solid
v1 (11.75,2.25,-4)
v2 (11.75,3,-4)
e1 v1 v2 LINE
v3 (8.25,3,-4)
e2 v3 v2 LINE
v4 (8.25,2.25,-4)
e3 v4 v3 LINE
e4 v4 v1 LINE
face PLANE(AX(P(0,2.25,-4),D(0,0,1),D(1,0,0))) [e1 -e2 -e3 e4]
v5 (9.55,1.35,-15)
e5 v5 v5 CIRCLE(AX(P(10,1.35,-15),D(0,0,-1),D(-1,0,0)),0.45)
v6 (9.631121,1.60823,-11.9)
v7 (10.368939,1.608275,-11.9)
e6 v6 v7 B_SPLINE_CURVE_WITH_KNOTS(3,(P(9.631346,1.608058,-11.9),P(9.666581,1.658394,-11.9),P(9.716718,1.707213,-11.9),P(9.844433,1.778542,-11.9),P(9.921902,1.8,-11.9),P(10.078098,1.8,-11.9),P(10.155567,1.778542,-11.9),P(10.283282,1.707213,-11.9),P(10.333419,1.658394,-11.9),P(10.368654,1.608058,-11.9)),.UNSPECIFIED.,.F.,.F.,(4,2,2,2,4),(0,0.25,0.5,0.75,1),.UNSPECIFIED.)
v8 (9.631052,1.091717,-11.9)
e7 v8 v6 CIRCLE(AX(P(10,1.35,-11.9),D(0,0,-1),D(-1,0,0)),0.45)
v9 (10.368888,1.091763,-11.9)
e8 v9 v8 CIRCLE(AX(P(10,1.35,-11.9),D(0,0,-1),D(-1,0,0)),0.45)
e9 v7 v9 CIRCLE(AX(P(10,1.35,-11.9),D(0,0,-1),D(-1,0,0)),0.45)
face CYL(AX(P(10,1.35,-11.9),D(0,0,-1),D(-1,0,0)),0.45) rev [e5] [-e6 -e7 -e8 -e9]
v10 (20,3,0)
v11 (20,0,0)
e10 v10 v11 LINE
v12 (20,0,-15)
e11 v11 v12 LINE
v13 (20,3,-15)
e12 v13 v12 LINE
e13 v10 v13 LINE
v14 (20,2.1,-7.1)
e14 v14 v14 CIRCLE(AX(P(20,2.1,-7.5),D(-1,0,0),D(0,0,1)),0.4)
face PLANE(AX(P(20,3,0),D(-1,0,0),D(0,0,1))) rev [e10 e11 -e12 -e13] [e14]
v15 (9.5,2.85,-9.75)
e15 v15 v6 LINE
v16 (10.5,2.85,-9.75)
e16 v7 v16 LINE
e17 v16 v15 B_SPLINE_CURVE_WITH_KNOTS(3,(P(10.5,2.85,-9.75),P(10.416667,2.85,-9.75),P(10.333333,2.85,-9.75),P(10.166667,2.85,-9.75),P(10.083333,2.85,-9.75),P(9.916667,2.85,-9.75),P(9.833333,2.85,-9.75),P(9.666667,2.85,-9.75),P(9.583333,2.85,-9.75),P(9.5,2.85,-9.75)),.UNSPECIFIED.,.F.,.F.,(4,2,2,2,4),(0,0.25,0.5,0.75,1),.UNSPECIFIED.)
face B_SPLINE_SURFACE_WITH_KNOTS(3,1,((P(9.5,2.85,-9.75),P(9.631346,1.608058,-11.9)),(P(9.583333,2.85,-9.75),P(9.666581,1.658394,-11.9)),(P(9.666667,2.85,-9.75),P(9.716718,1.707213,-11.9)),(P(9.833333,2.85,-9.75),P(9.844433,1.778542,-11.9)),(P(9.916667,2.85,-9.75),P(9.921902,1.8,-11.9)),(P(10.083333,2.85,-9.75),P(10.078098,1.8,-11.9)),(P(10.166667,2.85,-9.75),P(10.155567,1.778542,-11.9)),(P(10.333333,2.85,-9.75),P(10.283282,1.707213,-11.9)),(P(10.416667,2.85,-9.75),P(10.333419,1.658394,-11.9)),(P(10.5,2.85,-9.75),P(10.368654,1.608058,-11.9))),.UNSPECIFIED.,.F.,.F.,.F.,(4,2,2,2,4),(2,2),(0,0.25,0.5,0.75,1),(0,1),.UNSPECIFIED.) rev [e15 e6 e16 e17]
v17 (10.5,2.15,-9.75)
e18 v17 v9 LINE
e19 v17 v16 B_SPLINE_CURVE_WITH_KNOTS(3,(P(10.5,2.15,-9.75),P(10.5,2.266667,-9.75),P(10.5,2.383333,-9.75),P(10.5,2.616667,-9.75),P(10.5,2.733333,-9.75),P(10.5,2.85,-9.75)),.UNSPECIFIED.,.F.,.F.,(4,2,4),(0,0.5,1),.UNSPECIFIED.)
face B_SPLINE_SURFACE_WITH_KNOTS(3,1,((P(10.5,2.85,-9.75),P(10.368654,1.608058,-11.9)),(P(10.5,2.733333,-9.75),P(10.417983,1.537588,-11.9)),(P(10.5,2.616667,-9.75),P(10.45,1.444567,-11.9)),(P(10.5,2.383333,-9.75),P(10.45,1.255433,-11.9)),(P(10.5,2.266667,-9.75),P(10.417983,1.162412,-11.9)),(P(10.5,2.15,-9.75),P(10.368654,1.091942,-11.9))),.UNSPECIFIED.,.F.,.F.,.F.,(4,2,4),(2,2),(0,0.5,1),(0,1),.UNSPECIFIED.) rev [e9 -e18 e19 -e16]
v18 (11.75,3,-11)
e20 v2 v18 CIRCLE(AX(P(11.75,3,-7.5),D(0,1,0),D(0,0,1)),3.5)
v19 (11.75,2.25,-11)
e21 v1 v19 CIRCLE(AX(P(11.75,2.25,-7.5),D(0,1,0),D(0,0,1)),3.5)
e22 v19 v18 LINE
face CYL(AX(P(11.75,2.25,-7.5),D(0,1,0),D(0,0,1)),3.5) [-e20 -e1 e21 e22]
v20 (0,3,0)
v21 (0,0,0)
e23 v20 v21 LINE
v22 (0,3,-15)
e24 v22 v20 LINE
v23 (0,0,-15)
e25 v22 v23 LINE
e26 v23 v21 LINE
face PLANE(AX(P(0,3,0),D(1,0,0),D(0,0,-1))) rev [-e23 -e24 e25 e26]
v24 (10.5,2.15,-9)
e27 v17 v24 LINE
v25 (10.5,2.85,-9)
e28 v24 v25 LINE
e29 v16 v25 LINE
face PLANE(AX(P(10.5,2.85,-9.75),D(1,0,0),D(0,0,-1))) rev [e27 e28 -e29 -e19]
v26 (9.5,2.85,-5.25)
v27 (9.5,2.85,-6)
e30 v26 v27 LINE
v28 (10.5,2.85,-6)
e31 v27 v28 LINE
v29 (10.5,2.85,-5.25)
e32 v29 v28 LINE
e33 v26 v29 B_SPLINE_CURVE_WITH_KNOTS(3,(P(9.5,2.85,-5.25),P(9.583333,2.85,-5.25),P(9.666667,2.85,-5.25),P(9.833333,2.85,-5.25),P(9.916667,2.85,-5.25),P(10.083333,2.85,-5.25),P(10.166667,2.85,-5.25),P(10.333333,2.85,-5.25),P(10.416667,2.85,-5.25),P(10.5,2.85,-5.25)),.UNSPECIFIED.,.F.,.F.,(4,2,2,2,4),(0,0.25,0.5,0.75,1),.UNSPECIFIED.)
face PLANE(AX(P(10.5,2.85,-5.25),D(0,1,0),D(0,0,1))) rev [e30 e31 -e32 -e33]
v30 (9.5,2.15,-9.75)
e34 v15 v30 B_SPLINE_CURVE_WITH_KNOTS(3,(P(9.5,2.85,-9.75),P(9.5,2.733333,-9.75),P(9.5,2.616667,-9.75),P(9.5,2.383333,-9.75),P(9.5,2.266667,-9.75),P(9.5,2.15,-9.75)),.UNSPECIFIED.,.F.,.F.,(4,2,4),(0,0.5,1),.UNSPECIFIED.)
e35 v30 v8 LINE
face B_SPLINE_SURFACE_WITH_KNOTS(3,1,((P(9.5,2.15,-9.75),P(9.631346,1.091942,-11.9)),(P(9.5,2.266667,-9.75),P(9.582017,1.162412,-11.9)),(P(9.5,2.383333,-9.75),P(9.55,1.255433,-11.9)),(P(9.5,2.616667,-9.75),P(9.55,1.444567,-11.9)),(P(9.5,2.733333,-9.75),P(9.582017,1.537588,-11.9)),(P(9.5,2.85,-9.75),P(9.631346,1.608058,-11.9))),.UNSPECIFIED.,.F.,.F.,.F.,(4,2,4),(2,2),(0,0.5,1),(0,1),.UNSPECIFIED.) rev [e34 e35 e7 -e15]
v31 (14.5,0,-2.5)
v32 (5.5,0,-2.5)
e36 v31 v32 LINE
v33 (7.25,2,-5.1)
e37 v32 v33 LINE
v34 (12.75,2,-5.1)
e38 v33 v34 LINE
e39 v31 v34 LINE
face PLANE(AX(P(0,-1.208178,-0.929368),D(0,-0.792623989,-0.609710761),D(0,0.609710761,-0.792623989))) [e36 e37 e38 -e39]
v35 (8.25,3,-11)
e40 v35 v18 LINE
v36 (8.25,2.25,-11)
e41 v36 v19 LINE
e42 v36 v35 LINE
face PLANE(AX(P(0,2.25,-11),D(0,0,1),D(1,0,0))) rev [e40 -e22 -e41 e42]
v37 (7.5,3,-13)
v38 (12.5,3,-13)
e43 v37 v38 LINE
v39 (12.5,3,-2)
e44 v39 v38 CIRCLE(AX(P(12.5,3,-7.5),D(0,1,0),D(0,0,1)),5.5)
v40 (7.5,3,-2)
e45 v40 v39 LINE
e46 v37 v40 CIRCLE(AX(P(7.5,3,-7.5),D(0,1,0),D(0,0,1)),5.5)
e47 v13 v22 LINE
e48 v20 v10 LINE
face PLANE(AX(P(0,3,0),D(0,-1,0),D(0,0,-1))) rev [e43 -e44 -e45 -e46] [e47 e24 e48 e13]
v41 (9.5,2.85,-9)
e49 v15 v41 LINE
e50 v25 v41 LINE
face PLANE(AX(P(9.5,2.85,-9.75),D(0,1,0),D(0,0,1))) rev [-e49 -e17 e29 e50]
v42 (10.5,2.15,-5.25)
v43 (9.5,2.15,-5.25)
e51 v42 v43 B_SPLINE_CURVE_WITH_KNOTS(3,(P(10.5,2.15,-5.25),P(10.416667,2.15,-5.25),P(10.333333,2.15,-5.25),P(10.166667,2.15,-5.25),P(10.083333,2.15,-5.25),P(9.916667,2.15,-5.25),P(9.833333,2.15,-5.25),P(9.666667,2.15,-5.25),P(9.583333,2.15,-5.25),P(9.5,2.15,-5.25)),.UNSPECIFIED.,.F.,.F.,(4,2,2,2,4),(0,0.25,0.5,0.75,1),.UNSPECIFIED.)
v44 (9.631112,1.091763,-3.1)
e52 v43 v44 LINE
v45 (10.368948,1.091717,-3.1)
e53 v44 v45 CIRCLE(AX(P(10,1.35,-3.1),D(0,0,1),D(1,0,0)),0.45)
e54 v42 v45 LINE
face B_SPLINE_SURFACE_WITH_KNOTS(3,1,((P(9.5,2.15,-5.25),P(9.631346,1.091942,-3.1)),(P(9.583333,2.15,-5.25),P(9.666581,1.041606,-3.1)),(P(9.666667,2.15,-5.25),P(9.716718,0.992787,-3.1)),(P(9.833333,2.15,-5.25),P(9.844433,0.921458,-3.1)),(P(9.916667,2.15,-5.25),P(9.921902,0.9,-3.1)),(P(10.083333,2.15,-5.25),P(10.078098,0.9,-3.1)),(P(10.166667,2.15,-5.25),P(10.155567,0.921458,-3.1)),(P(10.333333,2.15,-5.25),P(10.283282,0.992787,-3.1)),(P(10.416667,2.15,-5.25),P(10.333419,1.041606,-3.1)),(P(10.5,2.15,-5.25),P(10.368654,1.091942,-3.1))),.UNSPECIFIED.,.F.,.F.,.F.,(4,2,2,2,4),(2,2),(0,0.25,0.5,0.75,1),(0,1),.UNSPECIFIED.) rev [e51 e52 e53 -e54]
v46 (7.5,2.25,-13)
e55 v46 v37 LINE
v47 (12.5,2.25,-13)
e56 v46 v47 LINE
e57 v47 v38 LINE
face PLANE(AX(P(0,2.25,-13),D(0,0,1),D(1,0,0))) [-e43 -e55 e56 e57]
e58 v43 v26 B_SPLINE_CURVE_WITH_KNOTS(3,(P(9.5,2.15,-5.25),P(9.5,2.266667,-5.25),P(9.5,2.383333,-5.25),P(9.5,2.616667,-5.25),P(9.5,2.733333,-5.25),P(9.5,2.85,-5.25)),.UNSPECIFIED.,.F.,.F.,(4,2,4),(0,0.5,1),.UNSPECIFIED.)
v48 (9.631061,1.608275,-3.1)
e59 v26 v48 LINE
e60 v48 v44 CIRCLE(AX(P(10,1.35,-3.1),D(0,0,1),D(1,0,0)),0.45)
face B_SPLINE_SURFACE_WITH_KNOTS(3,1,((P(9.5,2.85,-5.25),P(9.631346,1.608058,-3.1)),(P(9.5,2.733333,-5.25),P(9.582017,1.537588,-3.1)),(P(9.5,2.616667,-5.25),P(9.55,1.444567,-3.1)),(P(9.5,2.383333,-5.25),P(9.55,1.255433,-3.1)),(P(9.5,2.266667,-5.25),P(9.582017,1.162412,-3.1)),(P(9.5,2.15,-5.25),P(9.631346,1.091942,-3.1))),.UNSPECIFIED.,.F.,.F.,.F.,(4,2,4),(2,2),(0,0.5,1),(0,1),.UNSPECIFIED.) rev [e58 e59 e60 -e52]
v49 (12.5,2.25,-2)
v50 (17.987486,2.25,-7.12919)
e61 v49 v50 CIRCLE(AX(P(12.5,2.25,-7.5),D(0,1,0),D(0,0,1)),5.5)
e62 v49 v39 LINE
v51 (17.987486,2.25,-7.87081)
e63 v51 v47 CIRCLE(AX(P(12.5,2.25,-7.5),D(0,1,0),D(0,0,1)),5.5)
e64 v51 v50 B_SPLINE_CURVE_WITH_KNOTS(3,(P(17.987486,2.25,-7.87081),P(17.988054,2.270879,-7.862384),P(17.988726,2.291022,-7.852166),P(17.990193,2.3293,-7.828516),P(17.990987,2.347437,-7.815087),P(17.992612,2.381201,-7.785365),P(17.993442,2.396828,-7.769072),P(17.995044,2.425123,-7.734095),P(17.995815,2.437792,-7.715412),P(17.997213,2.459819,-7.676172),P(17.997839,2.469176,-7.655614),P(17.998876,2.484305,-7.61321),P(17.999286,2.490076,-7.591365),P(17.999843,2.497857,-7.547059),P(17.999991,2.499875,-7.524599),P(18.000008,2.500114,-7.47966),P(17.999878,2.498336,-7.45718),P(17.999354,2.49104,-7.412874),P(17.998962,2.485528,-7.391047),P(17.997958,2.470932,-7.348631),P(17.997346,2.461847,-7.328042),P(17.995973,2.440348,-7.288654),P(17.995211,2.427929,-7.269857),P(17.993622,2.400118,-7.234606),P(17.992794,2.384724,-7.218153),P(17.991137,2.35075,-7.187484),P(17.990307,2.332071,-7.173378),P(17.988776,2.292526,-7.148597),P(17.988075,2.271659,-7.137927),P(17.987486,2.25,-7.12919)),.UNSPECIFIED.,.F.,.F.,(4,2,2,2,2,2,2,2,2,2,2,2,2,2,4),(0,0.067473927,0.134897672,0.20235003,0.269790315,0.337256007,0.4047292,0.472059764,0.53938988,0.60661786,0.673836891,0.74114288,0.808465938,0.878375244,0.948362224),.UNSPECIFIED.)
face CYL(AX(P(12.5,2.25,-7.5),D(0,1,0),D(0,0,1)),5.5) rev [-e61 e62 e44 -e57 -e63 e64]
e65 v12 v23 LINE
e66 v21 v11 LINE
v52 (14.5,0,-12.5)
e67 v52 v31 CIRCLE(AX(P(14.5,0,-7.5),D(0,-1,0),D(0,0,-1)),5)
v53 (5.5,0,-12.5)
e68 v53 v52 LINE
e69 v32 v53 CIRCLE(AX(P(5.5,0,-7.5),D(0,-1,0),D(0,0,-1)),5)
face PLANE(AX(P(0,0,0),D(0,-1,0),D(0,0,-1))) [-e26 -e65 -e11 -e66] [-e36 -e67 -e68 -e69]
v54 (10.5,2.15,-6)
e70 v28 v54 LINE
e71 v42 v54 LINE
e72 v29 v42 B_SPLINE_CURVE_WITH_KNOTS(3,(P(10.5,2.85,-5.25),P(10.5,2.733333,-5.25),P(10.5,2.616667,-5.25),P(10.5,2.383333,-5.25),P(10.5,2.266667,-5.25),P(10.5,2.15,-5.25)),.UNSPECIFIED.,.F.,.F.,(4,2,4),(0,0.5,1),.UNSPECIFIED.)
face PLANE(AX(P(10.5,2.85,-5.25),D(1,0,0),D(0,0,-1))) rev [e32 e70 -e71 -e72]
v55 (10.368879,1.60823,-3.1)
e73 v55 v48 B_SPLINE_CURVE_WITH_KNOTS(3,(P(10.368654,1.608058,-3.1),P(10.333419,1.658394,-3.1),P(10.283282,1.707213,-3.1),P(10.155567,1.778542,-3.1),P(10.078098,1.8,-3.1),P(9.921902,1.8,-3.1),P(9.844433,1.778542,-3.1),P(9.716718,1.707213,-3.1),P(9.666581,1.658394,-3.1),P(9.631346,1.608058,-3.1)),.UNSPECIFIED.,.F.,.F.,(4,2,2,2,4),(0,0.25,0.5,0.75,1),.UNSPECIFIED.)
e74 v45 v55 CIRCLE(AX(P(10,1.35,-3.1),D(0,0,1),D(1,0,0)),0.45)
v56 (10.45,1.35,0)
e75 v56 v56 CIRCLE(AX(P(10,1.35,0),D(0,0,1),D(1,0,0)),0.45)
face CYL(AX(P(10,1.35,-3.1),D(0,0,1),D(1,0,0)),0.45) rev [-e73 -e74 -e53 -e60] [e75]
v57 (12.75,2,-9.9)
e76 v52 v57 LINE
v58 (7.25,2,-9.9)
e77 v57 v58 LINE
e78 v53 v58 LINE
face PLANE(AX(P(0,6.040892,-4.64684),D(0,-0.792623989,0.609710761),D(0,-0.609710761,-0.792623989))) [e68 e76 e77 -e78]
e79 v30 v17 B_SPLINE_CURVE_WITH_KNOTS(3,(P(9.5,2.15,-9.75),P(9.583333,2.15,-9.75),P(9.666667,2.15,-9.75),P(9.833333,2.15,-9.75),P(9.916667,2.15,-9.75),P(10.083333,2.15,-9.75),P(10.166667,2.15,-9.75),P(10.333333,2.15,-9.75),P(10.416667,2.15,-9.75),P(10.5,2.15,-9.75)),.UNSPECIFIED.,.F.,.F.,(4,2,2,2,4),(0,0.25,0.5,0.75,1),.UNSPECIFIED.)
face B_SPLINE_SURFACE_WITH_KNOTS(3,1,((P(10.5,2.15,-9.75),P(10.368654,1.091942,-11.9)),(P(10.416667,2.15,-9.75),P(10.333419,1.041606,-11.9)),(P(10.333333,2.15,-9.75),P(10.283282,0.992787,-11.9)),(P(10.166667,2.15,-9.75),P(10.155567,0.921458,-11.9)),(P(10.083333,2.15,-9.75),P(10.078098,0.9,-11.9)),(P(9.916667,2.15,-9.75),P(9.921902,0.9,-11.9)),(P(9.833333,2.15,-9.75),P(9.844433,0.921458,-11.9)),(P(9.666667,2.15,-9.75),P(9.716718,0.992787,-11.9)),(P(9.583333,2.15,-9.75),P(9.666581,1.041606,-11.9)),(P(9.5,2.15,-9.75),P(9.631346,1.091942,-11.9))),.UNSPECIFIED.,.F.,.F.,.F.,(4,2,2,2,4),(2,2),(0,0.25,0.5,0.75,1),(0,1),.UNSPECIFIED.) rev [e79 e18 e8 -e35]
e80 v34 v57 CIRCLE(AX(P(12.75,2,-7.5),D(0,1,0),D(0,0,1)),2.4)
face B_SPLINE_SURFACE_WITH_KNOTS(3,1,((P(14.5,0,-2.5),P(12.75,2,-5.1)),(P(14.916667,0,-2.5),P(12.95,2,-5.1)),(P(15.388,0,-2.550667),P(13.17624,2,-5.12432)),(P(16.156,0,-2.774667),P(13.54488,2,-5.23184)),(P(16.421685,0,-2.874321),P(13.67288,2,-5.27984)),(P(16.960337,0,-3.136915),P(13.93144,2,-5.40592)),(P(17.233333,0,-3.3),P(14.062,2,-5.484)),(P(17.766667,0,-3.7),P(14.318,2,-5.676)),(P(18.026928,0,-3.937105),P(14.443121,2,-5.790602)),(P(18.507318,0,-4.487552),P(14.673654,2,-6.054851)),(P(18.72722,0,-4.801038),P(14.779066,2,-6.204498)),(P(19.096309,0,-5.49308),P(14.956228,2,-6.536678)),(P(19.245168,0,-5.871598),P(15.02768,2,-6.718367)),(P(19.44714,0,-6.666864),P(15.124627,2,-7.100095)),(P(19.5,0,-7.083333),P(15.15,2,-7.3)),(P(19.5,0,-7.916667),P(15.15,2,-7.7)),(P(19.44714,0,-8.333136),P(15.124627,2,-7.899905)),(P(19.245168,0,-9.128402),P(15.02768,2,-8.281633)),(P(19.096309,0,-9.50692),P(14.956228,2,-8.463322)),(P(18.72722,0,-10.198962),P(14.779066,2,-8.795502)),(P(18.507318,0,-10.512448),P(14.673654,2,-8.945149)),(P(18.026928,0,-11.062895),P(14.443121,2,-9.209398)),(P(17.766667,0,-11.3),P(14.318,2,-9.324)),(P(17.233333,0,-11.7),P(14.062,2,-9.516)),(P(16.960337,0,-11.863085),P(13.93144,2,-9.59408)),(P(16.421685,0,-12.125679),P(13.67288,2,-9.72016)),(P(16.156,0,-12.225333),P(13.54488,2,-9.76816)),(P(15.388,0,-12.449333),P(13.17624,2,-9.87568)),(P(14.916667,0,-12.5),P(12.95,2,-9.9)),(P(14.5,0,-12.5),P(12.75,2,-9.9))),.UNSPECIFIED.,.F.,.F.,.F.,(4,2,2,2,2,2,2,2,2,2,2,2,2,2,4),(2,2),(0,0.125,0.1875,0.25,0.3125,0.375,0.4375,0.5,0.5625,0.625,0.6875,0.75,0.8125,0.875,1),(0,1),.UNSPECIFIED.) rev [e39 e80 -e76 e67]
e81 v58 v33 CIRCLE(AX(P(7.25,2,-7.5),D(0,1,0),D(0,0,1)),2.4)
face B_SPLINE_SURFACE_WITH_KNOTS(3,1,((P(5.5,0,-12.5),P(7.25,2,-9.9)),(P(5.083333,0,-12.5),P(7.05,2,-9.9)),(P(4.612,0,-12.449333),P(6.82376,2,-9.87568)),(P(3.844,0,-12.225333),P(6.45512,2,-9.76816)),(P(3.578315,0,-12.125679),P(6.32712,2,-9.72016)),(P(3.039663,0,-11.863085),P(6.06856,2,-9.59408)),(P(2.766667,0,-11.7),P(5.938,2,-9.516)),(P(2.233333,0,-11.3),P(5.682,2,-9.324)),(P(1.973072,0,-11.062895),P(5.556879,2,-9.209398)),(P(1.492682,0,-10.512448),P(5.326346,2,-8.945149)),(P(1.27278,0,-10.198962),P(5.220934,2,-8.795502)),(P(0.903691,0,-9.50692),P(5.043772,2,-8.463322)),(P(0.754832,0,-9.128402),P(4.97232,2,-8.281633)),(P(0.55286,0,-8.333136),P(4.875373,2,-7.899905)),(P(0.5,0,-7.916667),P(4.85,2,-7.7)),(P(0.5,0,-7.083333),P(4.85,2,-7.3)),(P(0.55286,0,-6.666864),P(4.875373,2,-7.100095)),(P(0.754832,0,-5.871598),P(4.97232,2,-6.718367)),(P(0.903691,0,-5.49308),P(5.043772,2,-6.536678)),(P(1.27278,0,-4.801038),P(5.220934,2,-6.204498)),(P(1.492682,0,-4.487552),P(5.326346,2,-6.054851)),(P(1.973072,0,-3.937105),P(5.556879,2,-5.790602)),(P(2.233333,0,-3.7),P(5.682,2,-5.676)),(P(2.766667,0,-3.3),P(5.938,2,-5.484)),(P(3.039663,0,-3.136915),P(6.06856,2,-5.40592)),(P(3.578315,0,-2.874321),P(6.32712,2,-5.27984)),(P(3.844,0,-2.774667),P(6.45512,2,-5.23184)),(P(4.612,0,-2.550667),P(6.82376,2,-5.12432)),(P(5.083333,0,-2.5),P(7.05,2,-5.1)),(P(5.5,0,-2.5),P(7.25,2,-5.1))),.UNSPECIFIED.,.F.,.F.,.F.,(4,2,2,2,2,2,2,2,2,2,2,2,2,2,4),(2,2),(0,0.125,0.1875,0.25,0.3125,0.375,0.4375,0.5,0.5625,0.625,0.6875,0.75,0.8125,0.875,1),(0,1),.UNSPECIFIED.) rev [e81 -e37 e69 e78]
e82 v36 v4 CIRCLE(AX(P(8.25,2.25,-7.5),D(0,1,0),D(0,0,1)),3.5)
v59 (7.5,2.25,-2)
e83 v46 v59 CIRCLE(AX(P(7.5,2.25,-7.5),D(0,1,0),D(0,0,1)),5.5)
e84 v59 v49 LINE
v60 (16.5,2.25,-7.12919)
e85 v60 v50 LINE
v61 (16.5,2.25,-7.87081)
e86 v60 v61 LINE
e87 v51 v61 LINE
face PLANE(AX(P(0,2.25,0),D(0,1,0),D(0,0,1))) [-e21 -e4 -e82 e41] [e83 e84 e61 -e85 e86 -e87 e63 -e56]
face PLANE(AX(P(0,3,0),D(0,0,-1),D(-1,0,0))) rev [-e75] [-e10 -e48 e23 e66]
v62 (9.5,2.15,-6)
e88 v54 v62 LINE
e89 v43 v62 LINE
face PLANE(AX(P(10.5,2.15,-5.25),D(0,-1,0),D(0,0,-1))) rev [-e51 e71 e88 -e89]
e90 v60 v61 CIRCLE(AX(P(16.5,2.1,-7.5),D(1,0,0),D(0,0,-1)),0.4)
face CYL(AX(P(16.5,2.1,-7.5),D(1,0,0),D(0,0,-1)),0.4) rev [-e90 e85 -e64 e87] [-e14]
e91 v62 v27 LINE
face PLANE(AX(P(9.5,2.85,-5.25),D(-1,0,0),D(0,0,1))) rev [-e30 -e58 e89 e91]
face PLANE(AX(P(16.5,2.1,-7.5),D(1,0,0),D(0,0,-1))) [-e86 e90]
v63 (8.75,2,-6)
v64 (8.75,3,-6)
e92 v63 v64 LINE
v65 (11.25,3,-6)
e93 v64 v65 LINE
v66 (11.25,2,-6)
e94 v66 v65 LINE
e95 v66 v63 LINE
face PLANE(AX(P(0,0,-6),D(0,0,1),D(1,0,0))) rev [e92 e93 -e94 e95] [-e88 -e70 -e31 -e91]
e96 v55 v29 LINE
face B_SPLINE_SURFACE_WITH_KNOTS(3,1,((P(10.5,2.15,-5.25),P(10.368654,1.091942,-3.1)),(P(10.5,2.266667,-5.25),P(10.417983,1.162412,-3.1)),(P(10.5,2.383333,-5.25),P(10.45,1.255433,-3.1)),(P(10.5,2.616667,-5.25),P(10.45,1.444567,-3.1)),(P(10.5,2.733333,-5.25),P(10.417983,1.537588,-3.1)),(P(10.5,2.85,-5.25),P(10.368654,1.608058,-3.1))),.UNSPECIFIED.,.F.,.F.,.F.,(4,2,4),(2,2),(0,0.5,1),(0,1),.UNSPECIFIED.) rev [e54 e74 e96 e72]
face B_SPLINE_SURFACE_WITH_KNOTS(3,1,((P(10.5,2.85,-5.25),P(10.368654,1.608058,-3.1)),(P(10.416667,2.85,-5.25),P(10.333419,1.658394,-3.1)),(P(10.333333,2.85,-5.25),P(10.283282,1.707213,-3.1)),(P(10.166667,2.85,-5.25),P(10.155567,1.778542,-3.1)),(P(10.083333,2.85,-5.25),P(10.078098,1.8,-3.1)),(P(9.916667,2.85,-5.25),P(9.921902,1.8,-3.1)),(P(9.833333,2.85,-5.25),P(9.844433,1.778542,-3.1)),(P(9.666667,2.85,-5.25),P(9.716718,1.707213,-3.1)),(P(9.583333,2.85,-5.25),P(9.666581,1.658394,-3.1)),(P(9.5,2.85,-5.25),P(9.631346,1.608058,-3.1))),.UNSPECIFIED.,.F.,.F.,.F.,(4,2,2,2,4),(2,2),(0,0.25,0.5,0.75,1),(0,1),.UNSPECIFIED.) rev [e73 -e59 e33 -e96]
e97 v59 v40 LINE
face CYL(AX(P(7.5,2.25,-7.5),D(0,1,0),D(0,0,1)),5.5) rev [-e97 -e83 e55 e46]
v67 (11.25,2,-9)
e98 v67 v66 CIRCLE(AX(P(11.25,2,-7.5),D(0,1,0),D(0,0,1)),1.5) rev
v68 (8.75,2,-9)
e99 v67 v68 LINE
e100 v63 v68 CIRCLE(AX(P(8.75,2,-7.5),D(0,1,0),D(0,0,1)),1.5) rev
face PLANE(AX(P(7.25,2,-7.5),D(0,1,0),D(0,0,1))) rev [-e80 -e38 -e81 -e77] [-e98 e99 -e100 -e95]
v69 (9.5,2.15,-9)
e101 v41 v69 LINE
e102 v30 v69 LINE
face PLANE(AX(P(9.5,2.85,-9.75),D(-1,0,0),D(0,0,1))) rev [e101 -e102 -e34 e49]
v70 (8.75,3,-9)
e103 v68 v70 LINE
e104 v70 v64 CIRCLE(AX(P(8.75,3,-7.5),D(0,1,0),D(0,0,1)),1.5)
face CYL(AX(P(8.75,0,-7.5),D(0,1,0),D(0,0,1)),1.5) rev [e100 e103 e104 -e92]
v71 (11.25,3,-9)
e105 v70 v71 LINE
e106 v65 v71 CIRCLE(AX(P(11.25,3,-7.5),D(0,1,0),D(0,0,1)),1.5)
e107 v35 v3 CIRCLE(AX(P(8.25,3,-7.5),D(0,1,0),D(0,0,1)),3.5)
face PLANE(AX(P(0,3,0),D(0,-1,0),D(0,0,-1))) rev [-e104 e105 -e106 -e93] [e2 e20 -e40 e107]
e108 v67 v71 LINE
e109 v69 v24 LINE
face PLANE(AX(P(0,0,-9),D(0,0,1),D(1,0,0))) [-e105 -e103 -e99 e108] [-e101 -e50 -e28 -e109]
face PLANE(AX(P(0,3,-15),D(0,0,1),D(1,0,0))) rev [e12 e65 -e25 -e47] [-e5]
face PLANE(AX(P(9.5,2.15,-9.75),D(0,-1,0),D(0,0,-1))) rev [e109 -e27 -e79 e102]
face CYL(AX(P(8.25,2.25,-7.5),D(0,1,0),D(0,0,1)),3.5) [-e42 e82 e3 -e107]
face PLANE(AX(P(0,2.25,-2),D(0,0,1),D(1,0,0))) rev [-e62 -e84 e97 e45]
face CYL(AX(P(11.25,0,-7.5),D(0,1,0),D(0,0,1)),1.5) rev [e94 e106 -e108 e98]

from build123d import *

# Parameters (mm, degrees)
SKETCH1_W           = 20
SKETCH1_H           = 15
BOSS_EXTRUDE1_DEPTH = 3
CUT_EXTRUDE1_DEPTH  = 0.75
CUT_EXTRUDE2_DEPTH  = 26.179356624
SKETCH7_R           = 0.4
CUT_EXTRUDE6_DEPTH  = 3.5
SKETCH14_W          = 1
SKETCH14_H          = 0.7
CUT_EXTRUDE7_DEPTH  = 0.75
SKETCH15_R          = 0.45
CUT_EXTRUDE8_DEPTH  = 3.1
CUT_EXTRUDE9_START  = -3.1
SKETCH16_R          = 0.45
CUT_EXTRUDE9_DEPTH  = 3.1
SKETCH17_W          = 1
SKETCH17_H          = 0.7
CUT_EXTRUDE10_DEPTH = 0.75


with BuildPart() as part:
    # Sketch1 → Boss-Extrude1 (new body)
    with BuildSketch(Plane(origin=(0, 0, 0), x_dir=(1, 0, 0), z_dir=(0, 1, 0))):
        with Locations((10, 7.5)):
            Rectangle(SKETCH1_W, SKETCH1_H)
    extrude(amount=BOSS_EXTRUDE1_DEPTH)

    # Sketch2 → Cut-Extrude1 (cut)
    with BuildSketch(Plane(origin=(0, 3, 0), x_dir=(1, 0, 0), z_dir=(0, 1, 0))):
        with BuildLine():
            Line((7.5, 13), (12.5, 13))
            ThreePointArc((12.5, 13), (18, 7.5), (12.5, 2))
            Line((12.5, 2), (7.5, 2))
            ThreePointArc((7.5, 2), (2, 7.5), (7.5, 13))
        make_face()
        with BuildLine():
            Line((8.25, 11), (11.75, 11))
            ThreePointArc((11.75, 11), (15.25, 7.5), (11.75, 4))
            Line((11.75, 4), (8.25, 4))
            ThreePointArc((8.25, 4), (4.75, 7.5), (8.25, 11))
        make_face(mode=Mode.SUBTRACT)
    extrude(amount=-CUT_EXTRUDE1_DEPTH, mode=Mode.SUBTRACT)

    # Sketch2<3> → Cut-Extrude2 (cut, through all)
    with BuildSketch(Plane(origin=(0, 3, 0), x_dir=(1, 0, 0), z_dir=(0, 1, 0))):
        with BuildLine():
            Line((8.75, 6), (11.25, 6))
            ThreePointArc((11.25, 6), (12.75, 7.5), (11.25, 9))
            Line((11.25, 9), (8.75, 9))
            ThreePointArc((8.75, 9), (7.25, 7.5), (8.75, 6))
        make_face()
    extrude(amount=-CUT_EXTRUDE2_DEPTH, mode=Mode.SUBTRACT)

    # Sketch7 → Cut-Extrude6 (cut, symmetric)
    with BuildSketch(Plane(origin=(20, 0, 0), x_dir=(0, 0, -1), z_dir=(1, 0, 0))):
        with Locations(Location((7.5, 2.1, 0), (0, 0, 22.024312837))):
            Circle(SKETCH7_R)
    extrude(amount=CUT_EXTRUDE6_DEPTH, both=True, mode=Mode.SUBTRACT)

    # Sketch8 → Cut-Loft1 section 0
    with BuildSketch(Plane.XZ):
        with BuildLine():
            Line((5.5, -2.5), (14.5, -2.5))
            ThreePointArc((14.5, -2.5), (19.5, -7.5), (14.5, -12.5))
            Line((14.5, -12.5), (5.5, -12.5))
            ThreePointArc((5.5, -12.5), (0.5, -7.5), (5.5, -2.5))
        make_face()
    # Sketch9 → Cut-Loft1 section 1
    with BuildSketch(Plane(origin=(0, 2, 0), x_dir=(1, 0, 0), z_dir=(0, 1, 0))):
        with BuildLine():
            Line((7.25, 9.9), (12.75, 9.9))
            ThreePointArc((12.75, 9.9), (15.15, 7.5), (12.75, 5.1))
            Line((12.75, 5.1), (7.25, 5.1))
            ThreePointArc((7.25, 5.1), (4.85, 7.5), (7.25, 9.9))
        make_face()
    loft(mode=Mode.SUBTRACT)

    # Sketch14 → Cut-Extrude7 (cut)
    with BuildSketch(Plane(origin=(0, 0, -6), x_dir=(-1, 0, 0), z_dir=(0, 0, -1))):
        with Locations((-10, 2.5)):
            Rectangle(SKETCH14_W, SKETCH14_H)
    extrude(amount=-CUT_EXTRUDE7_DEPTH, mode=Mode.SUBTRACT)

    # Sketch15 → Cut-Extrude8 (cut)
    with BuildSketch(Plane.XY):
        with Locations((10, 1.35)):
            Circle(SKETCH15_R)
    extrude(amount=-CUT_EXTRUDE8_DEPTH, mode=Mode.SUBTRACT)

    # Sketch16 → Cut-Extrude9 (cut)
    with BuildSketch(Plane(origin=(0, 0, -15), x_dir=(-1, 0, 0), z_dir=(0, 0, -1)).offset(CUT_EXTRUDE9_START)):
        with Locations(Location((-10, 1.35, 0), (0, 0, 180))):
            Circle(SKETCH16_R)
    extrude(amount=CUT_EXTRUDE9_DEPTH, mode=Mode.SUBTRACT)

    # Sketch17 → Cut-Extrude10 (cut)
    with BuildSketch(Plane.XY.offset(-9)):
        with Locations((10, 2.5)):
            Rectangle(SKETCH17_W, SKETCH17_H)
    extrude(amount=-CUT_EXTRUDE10_DEPTH, mode=Mode.SUBTRACT)

    # Cut-Loft6: read off the stored shape, not the designer's step
    # Cut-Loft6: loft between two sections, ruled curve by curve
    cut_loft6_from = [
        Edge.make_bspline([(10.5, 2.85, -5.25), (10.416666667, 2.85, -5.25), (10.333333333, 2.85, -5.25), (10.166666667, 2.85, -5.25), (10.083333333, 2.85, -5.25), (9.916666667, 2.85, -5.25), (9.833333333, 2.85, -5.25), (9.666666667, 2.85, -5.25), (9.583333333, 2.85, -5.25), (9.5, 2.85, -5.25)], [0, 0, 0, 0, 0.25, 0.25, 0.5, 0.5, 0.75, 0.75, 1, 1, 1, 1], 3),
        Edge.make_bspline([(9.5, 2.85, -5.25), (9.5, 2.733333333, -5.25), (9.5, 2.616666667, -5.25), (9.5, 2.383333333, -5.25), (9.5, 2.266666667, -5.25), (9.5, 2.15, -5.25)], [0, 0, 0, 0, 0.5, 0.5, 1, 1, 1, 1], 3),
        Edge.make_bspline([(10.5, 2.15, -5.25), (10.5, 2.266666667, -5.25), (10.5, 2.383333333, -5.25), (10.5, 2.616666667, -5.25), (10.5, 2.733333333, -5.25), (10.5, 2.85, -5.25)], [0, 0, 0, 0, 0.5, 0.5, 1, 1, 1, 1], 3),
        Edge.make_bspline([(9.5, 2.15, -5.25), (9.583333333, 2.15, -5.25), (9.666666667, 2.15, -5.25), (9.833333333, 2.15, -5.25), (9.916666667, 2.15, -5.25), (10.083333333, 2.15, -5.25), (10.166666667, 2.15, -5.25), (10.333333333, 2.15, -5.25), (10.416666667, 2.15, -5.25), (10.5, 2.15, -5.25)], [0, 0, 0, 0, 0.25, 0.25, 0.5, 0.5, 0.75, 0.75, 1, 1, 1, 1], 3),
    ]
    cut_loft6_to = [
        Edge.make_bspline([(10.368654364, 1.608058055, -3.1), (10.333419465, 1.658393625, -3.1), (10.283281513, 1.707213189, -3.1), (10.155567455, 1.778542233, -3.1), (10.078098334, 1.8, -3.1), (9.921901666, 1.8, -3.1), (9.844432545, 1.778542233, -3.1), (9.716718487, 1.707213189, -3.1), (9.666580535, 1.658393625, -3.1), (9.631345636, 1.608058055, -3.1)], [0, 0, 0, 0, 0.25, 0.25, 0.5, 0.5, 0.75, 0.75, 1, 1, 1, 1], 3),
        Edge.make_bspline([(9.631345636, 1.608058055, -3.1), (9.582016777, 1.537588256, -3.1), (9.55, 1.444566669, -3.1), (9.55, 1.255433331, -3.1), (9.582016777, 1.162411744, -3.1), (9.631345636, 1.091941945, -3.1)], [0, 0, 0, 0, 0.5, 0.5, 1, 1, 1, 1], 3),
        Edge.make_bspline([(10.368654364, 1.091941945, -3.1), (10.417983223, 1.162411744, -3.1), (10.45, 1.255433331, -3.1), (10.45, 1.444566669, -3.1), (10.417983223, 1.537588256, -3.1), (10.368654364, 1.608058055, -3.1)], [0, 0, 0, 0, 0.5, 0.5, 1, 1, 1, 1], 3),
        Edge.make_bspline([(9.631345636, 1.091941945, -3.1), (9.666580535, 1.041606375, -3.1), (9.716718487, 0.992786811, -3.1), (9.844432545, 0.921457767, -3.1), (9.921901666, 0.9, -3.1), (10.078098334, 0.9, -3.1), (10.155567455, 0.921457767, -3.1), (10.283281513, 0.992786811, -3.1), (10.333419465, 1.041606375, -3.1), (10.368654364, 1.091941945, -3.1)], [0, 0, 0, 0, 0.25, 0.25, 0.5, 0.5, 0.75, 0.75, 1, 1, 1, 1], 3),
    ]
    cut_loft6 = Solid(Shell([*[Face.make_surface_from_curves(cut_loft6_from[k], cut_loft6_to[k]) for k in range(4)], Face(Wire(cut_loft6_from)), Face(Wire(cut_loft6_to))]))
    add(cut_loft6, mode=Mode.SUBTRACT)

    # Cut-Loft8: read off the stored shape, not the designer's step
    # Cut-Loft8: loft between two sections, ruled curve by curve
    cut_loft8_from = [
        Edge.make_bspline([(10.5, 2.85, -9.75), (10.5, 2.733333333, -9.75), (10.5, 2.616666667, -9.75), (10.5, 2.383333333, -9.75), (10.5, 2.266666667, -9.75), (10.5, 2.15, -9.75)], [0, 0, 0, 0, 0.5, 0.5, 1, 1, 1, 1], 3),
        Edge.make_bspline([(10.5, 2.15, -9.75), (10.416666667, 2.15, -9.75), (10.333333333, 2.15, -9.75), (10.166666667, 2.15, -9.75), (10.083333333, 2.15, -9.75), (9.916666667, 2.15, -9.75), (9.833333333, 2.15, -9.75), (9.666666667, 2.15, -9.75), (9.583333333, 2.15, -9.75), (9.5, 2.15, -9.75)], [0, 0, 0, 0, 0.25, 0.25, 0.5, 0.5, 0.75, 0.75, 1, 1, 1, 1], 3),
        Edge.make_bspline([(9.5, 2.85, -9.75), (9.583333333, 2.85, -9.75), (9.666666667, 2.85, -9.75), (9.833333333, 2.85, -9.75), (9.916666667, 2.85, -9.75), (10.083333333, 2.85, -9.75), (10.166666667, 2.85, -9.75), (10.333333333, 2.85, -9.75), (10.416666667, 2.85, -9.75), (10.5, 2.85, -9.75)], [0, 0, 0, 0, 0.25, 0.25, 0.5, 0.5, 0.75, 0.75, 1, 1, 1, 1], 3),
        Edge.make_bspline([(9.5, 2.15, -9.75), (9.5, 2.266666667, -9.75), (9.5, 2.383333333, -9.75), (9.5, 2.616666667, -9.75), (9.5, 2.733333333, -9.75), (9.5, 2.85, -9.75)], [0, 0, 0, 0, 0.5, 0.5, 1, 1, 1, 1], 3),
    ]
    cut_loft8_to = [
        Edge.make_bspline([(10.368654364, 1.608058055, -11.9), (10.417983223, 1.537588256, -11.9), (10.45, 1.444566669, -11.9), (10.45, 1.255433331, -11.9), (10.417983223, 1.162411744, -11.9), (10.368654364, 1.091941945, -11.9)], [0, 0, 0, 0, 0.5, 0.5, 1, 1, 1, 1], 3),
        Edge.make_bspline([(10.368654364, 1.091941945, -11.9), (10.333419465, 1.041606375, -11.9), (10.283281513, 0.992786811, -11.9), (10.155567455, 0.921457767, -11.9), (10.078098334, 0.9, -11.9), (9.921901666, 0.9, -11.9), (9.844432545, 0.921457767, -11.9), (9.716718487, 0.992786811, -11.9), (9.666580535, 1.041606375, -11.9), (9.631345636, 1.091941945, -11.9)], [0, 0, 0, 0, 0.25, 0.25, 0.5, 0.5, 0.75, 0.75, 1, 1, 1, 1], 3),
        Edge.make_bspline([(9.631345636, 1.608058055, -11.9), (9.666580535, 1.658393625, -11.9), (9.716718487, 1.707213189, -11.9), (9.844432545, 1.778542233, -11.9), (9.921901666, 1.8, -11.9), (10.078098334, 1.8, -11.9), (10.155567455, 1.778542233, -11.9), (10.283281513, 1.707213189, -11.9), (10.333419465, 1.658393625, -11.9), (10.368654364, 1.608058055, -11.9)], [0, 0, 0, 0, 0.25, 0.25, 0.5, 0.5, 0.75, 0.75, 1, 1, 1, 1], 3),
        Edge.make_bspline([(9.631345636, 1.091941945, -11.9), (9.582016777, 1.162411744, -11.9), (9.55, 1.255433331, -11.9), (9.55, 1.444566669, -11.9), (9.582016777, 1.537588256, -11.9), (9.631345636, 1.608058055, -11.9)], [0, 0, 0, 0, 0.5, 0.5, 1, 1, 1, 1], 3),
    ]
    cut_loft8 = Solid(Shell([*[Face.make_surface_from_curves(cut_loft8_from[k], cut_loft8_to[k]) for k in range(4)], Face(Wire(cut_loft8_from)), Face(Wire(cut_loft8_to))]))
    add(cut_loft8, mode=Mode.SUBTRACT)


solid = part.part
